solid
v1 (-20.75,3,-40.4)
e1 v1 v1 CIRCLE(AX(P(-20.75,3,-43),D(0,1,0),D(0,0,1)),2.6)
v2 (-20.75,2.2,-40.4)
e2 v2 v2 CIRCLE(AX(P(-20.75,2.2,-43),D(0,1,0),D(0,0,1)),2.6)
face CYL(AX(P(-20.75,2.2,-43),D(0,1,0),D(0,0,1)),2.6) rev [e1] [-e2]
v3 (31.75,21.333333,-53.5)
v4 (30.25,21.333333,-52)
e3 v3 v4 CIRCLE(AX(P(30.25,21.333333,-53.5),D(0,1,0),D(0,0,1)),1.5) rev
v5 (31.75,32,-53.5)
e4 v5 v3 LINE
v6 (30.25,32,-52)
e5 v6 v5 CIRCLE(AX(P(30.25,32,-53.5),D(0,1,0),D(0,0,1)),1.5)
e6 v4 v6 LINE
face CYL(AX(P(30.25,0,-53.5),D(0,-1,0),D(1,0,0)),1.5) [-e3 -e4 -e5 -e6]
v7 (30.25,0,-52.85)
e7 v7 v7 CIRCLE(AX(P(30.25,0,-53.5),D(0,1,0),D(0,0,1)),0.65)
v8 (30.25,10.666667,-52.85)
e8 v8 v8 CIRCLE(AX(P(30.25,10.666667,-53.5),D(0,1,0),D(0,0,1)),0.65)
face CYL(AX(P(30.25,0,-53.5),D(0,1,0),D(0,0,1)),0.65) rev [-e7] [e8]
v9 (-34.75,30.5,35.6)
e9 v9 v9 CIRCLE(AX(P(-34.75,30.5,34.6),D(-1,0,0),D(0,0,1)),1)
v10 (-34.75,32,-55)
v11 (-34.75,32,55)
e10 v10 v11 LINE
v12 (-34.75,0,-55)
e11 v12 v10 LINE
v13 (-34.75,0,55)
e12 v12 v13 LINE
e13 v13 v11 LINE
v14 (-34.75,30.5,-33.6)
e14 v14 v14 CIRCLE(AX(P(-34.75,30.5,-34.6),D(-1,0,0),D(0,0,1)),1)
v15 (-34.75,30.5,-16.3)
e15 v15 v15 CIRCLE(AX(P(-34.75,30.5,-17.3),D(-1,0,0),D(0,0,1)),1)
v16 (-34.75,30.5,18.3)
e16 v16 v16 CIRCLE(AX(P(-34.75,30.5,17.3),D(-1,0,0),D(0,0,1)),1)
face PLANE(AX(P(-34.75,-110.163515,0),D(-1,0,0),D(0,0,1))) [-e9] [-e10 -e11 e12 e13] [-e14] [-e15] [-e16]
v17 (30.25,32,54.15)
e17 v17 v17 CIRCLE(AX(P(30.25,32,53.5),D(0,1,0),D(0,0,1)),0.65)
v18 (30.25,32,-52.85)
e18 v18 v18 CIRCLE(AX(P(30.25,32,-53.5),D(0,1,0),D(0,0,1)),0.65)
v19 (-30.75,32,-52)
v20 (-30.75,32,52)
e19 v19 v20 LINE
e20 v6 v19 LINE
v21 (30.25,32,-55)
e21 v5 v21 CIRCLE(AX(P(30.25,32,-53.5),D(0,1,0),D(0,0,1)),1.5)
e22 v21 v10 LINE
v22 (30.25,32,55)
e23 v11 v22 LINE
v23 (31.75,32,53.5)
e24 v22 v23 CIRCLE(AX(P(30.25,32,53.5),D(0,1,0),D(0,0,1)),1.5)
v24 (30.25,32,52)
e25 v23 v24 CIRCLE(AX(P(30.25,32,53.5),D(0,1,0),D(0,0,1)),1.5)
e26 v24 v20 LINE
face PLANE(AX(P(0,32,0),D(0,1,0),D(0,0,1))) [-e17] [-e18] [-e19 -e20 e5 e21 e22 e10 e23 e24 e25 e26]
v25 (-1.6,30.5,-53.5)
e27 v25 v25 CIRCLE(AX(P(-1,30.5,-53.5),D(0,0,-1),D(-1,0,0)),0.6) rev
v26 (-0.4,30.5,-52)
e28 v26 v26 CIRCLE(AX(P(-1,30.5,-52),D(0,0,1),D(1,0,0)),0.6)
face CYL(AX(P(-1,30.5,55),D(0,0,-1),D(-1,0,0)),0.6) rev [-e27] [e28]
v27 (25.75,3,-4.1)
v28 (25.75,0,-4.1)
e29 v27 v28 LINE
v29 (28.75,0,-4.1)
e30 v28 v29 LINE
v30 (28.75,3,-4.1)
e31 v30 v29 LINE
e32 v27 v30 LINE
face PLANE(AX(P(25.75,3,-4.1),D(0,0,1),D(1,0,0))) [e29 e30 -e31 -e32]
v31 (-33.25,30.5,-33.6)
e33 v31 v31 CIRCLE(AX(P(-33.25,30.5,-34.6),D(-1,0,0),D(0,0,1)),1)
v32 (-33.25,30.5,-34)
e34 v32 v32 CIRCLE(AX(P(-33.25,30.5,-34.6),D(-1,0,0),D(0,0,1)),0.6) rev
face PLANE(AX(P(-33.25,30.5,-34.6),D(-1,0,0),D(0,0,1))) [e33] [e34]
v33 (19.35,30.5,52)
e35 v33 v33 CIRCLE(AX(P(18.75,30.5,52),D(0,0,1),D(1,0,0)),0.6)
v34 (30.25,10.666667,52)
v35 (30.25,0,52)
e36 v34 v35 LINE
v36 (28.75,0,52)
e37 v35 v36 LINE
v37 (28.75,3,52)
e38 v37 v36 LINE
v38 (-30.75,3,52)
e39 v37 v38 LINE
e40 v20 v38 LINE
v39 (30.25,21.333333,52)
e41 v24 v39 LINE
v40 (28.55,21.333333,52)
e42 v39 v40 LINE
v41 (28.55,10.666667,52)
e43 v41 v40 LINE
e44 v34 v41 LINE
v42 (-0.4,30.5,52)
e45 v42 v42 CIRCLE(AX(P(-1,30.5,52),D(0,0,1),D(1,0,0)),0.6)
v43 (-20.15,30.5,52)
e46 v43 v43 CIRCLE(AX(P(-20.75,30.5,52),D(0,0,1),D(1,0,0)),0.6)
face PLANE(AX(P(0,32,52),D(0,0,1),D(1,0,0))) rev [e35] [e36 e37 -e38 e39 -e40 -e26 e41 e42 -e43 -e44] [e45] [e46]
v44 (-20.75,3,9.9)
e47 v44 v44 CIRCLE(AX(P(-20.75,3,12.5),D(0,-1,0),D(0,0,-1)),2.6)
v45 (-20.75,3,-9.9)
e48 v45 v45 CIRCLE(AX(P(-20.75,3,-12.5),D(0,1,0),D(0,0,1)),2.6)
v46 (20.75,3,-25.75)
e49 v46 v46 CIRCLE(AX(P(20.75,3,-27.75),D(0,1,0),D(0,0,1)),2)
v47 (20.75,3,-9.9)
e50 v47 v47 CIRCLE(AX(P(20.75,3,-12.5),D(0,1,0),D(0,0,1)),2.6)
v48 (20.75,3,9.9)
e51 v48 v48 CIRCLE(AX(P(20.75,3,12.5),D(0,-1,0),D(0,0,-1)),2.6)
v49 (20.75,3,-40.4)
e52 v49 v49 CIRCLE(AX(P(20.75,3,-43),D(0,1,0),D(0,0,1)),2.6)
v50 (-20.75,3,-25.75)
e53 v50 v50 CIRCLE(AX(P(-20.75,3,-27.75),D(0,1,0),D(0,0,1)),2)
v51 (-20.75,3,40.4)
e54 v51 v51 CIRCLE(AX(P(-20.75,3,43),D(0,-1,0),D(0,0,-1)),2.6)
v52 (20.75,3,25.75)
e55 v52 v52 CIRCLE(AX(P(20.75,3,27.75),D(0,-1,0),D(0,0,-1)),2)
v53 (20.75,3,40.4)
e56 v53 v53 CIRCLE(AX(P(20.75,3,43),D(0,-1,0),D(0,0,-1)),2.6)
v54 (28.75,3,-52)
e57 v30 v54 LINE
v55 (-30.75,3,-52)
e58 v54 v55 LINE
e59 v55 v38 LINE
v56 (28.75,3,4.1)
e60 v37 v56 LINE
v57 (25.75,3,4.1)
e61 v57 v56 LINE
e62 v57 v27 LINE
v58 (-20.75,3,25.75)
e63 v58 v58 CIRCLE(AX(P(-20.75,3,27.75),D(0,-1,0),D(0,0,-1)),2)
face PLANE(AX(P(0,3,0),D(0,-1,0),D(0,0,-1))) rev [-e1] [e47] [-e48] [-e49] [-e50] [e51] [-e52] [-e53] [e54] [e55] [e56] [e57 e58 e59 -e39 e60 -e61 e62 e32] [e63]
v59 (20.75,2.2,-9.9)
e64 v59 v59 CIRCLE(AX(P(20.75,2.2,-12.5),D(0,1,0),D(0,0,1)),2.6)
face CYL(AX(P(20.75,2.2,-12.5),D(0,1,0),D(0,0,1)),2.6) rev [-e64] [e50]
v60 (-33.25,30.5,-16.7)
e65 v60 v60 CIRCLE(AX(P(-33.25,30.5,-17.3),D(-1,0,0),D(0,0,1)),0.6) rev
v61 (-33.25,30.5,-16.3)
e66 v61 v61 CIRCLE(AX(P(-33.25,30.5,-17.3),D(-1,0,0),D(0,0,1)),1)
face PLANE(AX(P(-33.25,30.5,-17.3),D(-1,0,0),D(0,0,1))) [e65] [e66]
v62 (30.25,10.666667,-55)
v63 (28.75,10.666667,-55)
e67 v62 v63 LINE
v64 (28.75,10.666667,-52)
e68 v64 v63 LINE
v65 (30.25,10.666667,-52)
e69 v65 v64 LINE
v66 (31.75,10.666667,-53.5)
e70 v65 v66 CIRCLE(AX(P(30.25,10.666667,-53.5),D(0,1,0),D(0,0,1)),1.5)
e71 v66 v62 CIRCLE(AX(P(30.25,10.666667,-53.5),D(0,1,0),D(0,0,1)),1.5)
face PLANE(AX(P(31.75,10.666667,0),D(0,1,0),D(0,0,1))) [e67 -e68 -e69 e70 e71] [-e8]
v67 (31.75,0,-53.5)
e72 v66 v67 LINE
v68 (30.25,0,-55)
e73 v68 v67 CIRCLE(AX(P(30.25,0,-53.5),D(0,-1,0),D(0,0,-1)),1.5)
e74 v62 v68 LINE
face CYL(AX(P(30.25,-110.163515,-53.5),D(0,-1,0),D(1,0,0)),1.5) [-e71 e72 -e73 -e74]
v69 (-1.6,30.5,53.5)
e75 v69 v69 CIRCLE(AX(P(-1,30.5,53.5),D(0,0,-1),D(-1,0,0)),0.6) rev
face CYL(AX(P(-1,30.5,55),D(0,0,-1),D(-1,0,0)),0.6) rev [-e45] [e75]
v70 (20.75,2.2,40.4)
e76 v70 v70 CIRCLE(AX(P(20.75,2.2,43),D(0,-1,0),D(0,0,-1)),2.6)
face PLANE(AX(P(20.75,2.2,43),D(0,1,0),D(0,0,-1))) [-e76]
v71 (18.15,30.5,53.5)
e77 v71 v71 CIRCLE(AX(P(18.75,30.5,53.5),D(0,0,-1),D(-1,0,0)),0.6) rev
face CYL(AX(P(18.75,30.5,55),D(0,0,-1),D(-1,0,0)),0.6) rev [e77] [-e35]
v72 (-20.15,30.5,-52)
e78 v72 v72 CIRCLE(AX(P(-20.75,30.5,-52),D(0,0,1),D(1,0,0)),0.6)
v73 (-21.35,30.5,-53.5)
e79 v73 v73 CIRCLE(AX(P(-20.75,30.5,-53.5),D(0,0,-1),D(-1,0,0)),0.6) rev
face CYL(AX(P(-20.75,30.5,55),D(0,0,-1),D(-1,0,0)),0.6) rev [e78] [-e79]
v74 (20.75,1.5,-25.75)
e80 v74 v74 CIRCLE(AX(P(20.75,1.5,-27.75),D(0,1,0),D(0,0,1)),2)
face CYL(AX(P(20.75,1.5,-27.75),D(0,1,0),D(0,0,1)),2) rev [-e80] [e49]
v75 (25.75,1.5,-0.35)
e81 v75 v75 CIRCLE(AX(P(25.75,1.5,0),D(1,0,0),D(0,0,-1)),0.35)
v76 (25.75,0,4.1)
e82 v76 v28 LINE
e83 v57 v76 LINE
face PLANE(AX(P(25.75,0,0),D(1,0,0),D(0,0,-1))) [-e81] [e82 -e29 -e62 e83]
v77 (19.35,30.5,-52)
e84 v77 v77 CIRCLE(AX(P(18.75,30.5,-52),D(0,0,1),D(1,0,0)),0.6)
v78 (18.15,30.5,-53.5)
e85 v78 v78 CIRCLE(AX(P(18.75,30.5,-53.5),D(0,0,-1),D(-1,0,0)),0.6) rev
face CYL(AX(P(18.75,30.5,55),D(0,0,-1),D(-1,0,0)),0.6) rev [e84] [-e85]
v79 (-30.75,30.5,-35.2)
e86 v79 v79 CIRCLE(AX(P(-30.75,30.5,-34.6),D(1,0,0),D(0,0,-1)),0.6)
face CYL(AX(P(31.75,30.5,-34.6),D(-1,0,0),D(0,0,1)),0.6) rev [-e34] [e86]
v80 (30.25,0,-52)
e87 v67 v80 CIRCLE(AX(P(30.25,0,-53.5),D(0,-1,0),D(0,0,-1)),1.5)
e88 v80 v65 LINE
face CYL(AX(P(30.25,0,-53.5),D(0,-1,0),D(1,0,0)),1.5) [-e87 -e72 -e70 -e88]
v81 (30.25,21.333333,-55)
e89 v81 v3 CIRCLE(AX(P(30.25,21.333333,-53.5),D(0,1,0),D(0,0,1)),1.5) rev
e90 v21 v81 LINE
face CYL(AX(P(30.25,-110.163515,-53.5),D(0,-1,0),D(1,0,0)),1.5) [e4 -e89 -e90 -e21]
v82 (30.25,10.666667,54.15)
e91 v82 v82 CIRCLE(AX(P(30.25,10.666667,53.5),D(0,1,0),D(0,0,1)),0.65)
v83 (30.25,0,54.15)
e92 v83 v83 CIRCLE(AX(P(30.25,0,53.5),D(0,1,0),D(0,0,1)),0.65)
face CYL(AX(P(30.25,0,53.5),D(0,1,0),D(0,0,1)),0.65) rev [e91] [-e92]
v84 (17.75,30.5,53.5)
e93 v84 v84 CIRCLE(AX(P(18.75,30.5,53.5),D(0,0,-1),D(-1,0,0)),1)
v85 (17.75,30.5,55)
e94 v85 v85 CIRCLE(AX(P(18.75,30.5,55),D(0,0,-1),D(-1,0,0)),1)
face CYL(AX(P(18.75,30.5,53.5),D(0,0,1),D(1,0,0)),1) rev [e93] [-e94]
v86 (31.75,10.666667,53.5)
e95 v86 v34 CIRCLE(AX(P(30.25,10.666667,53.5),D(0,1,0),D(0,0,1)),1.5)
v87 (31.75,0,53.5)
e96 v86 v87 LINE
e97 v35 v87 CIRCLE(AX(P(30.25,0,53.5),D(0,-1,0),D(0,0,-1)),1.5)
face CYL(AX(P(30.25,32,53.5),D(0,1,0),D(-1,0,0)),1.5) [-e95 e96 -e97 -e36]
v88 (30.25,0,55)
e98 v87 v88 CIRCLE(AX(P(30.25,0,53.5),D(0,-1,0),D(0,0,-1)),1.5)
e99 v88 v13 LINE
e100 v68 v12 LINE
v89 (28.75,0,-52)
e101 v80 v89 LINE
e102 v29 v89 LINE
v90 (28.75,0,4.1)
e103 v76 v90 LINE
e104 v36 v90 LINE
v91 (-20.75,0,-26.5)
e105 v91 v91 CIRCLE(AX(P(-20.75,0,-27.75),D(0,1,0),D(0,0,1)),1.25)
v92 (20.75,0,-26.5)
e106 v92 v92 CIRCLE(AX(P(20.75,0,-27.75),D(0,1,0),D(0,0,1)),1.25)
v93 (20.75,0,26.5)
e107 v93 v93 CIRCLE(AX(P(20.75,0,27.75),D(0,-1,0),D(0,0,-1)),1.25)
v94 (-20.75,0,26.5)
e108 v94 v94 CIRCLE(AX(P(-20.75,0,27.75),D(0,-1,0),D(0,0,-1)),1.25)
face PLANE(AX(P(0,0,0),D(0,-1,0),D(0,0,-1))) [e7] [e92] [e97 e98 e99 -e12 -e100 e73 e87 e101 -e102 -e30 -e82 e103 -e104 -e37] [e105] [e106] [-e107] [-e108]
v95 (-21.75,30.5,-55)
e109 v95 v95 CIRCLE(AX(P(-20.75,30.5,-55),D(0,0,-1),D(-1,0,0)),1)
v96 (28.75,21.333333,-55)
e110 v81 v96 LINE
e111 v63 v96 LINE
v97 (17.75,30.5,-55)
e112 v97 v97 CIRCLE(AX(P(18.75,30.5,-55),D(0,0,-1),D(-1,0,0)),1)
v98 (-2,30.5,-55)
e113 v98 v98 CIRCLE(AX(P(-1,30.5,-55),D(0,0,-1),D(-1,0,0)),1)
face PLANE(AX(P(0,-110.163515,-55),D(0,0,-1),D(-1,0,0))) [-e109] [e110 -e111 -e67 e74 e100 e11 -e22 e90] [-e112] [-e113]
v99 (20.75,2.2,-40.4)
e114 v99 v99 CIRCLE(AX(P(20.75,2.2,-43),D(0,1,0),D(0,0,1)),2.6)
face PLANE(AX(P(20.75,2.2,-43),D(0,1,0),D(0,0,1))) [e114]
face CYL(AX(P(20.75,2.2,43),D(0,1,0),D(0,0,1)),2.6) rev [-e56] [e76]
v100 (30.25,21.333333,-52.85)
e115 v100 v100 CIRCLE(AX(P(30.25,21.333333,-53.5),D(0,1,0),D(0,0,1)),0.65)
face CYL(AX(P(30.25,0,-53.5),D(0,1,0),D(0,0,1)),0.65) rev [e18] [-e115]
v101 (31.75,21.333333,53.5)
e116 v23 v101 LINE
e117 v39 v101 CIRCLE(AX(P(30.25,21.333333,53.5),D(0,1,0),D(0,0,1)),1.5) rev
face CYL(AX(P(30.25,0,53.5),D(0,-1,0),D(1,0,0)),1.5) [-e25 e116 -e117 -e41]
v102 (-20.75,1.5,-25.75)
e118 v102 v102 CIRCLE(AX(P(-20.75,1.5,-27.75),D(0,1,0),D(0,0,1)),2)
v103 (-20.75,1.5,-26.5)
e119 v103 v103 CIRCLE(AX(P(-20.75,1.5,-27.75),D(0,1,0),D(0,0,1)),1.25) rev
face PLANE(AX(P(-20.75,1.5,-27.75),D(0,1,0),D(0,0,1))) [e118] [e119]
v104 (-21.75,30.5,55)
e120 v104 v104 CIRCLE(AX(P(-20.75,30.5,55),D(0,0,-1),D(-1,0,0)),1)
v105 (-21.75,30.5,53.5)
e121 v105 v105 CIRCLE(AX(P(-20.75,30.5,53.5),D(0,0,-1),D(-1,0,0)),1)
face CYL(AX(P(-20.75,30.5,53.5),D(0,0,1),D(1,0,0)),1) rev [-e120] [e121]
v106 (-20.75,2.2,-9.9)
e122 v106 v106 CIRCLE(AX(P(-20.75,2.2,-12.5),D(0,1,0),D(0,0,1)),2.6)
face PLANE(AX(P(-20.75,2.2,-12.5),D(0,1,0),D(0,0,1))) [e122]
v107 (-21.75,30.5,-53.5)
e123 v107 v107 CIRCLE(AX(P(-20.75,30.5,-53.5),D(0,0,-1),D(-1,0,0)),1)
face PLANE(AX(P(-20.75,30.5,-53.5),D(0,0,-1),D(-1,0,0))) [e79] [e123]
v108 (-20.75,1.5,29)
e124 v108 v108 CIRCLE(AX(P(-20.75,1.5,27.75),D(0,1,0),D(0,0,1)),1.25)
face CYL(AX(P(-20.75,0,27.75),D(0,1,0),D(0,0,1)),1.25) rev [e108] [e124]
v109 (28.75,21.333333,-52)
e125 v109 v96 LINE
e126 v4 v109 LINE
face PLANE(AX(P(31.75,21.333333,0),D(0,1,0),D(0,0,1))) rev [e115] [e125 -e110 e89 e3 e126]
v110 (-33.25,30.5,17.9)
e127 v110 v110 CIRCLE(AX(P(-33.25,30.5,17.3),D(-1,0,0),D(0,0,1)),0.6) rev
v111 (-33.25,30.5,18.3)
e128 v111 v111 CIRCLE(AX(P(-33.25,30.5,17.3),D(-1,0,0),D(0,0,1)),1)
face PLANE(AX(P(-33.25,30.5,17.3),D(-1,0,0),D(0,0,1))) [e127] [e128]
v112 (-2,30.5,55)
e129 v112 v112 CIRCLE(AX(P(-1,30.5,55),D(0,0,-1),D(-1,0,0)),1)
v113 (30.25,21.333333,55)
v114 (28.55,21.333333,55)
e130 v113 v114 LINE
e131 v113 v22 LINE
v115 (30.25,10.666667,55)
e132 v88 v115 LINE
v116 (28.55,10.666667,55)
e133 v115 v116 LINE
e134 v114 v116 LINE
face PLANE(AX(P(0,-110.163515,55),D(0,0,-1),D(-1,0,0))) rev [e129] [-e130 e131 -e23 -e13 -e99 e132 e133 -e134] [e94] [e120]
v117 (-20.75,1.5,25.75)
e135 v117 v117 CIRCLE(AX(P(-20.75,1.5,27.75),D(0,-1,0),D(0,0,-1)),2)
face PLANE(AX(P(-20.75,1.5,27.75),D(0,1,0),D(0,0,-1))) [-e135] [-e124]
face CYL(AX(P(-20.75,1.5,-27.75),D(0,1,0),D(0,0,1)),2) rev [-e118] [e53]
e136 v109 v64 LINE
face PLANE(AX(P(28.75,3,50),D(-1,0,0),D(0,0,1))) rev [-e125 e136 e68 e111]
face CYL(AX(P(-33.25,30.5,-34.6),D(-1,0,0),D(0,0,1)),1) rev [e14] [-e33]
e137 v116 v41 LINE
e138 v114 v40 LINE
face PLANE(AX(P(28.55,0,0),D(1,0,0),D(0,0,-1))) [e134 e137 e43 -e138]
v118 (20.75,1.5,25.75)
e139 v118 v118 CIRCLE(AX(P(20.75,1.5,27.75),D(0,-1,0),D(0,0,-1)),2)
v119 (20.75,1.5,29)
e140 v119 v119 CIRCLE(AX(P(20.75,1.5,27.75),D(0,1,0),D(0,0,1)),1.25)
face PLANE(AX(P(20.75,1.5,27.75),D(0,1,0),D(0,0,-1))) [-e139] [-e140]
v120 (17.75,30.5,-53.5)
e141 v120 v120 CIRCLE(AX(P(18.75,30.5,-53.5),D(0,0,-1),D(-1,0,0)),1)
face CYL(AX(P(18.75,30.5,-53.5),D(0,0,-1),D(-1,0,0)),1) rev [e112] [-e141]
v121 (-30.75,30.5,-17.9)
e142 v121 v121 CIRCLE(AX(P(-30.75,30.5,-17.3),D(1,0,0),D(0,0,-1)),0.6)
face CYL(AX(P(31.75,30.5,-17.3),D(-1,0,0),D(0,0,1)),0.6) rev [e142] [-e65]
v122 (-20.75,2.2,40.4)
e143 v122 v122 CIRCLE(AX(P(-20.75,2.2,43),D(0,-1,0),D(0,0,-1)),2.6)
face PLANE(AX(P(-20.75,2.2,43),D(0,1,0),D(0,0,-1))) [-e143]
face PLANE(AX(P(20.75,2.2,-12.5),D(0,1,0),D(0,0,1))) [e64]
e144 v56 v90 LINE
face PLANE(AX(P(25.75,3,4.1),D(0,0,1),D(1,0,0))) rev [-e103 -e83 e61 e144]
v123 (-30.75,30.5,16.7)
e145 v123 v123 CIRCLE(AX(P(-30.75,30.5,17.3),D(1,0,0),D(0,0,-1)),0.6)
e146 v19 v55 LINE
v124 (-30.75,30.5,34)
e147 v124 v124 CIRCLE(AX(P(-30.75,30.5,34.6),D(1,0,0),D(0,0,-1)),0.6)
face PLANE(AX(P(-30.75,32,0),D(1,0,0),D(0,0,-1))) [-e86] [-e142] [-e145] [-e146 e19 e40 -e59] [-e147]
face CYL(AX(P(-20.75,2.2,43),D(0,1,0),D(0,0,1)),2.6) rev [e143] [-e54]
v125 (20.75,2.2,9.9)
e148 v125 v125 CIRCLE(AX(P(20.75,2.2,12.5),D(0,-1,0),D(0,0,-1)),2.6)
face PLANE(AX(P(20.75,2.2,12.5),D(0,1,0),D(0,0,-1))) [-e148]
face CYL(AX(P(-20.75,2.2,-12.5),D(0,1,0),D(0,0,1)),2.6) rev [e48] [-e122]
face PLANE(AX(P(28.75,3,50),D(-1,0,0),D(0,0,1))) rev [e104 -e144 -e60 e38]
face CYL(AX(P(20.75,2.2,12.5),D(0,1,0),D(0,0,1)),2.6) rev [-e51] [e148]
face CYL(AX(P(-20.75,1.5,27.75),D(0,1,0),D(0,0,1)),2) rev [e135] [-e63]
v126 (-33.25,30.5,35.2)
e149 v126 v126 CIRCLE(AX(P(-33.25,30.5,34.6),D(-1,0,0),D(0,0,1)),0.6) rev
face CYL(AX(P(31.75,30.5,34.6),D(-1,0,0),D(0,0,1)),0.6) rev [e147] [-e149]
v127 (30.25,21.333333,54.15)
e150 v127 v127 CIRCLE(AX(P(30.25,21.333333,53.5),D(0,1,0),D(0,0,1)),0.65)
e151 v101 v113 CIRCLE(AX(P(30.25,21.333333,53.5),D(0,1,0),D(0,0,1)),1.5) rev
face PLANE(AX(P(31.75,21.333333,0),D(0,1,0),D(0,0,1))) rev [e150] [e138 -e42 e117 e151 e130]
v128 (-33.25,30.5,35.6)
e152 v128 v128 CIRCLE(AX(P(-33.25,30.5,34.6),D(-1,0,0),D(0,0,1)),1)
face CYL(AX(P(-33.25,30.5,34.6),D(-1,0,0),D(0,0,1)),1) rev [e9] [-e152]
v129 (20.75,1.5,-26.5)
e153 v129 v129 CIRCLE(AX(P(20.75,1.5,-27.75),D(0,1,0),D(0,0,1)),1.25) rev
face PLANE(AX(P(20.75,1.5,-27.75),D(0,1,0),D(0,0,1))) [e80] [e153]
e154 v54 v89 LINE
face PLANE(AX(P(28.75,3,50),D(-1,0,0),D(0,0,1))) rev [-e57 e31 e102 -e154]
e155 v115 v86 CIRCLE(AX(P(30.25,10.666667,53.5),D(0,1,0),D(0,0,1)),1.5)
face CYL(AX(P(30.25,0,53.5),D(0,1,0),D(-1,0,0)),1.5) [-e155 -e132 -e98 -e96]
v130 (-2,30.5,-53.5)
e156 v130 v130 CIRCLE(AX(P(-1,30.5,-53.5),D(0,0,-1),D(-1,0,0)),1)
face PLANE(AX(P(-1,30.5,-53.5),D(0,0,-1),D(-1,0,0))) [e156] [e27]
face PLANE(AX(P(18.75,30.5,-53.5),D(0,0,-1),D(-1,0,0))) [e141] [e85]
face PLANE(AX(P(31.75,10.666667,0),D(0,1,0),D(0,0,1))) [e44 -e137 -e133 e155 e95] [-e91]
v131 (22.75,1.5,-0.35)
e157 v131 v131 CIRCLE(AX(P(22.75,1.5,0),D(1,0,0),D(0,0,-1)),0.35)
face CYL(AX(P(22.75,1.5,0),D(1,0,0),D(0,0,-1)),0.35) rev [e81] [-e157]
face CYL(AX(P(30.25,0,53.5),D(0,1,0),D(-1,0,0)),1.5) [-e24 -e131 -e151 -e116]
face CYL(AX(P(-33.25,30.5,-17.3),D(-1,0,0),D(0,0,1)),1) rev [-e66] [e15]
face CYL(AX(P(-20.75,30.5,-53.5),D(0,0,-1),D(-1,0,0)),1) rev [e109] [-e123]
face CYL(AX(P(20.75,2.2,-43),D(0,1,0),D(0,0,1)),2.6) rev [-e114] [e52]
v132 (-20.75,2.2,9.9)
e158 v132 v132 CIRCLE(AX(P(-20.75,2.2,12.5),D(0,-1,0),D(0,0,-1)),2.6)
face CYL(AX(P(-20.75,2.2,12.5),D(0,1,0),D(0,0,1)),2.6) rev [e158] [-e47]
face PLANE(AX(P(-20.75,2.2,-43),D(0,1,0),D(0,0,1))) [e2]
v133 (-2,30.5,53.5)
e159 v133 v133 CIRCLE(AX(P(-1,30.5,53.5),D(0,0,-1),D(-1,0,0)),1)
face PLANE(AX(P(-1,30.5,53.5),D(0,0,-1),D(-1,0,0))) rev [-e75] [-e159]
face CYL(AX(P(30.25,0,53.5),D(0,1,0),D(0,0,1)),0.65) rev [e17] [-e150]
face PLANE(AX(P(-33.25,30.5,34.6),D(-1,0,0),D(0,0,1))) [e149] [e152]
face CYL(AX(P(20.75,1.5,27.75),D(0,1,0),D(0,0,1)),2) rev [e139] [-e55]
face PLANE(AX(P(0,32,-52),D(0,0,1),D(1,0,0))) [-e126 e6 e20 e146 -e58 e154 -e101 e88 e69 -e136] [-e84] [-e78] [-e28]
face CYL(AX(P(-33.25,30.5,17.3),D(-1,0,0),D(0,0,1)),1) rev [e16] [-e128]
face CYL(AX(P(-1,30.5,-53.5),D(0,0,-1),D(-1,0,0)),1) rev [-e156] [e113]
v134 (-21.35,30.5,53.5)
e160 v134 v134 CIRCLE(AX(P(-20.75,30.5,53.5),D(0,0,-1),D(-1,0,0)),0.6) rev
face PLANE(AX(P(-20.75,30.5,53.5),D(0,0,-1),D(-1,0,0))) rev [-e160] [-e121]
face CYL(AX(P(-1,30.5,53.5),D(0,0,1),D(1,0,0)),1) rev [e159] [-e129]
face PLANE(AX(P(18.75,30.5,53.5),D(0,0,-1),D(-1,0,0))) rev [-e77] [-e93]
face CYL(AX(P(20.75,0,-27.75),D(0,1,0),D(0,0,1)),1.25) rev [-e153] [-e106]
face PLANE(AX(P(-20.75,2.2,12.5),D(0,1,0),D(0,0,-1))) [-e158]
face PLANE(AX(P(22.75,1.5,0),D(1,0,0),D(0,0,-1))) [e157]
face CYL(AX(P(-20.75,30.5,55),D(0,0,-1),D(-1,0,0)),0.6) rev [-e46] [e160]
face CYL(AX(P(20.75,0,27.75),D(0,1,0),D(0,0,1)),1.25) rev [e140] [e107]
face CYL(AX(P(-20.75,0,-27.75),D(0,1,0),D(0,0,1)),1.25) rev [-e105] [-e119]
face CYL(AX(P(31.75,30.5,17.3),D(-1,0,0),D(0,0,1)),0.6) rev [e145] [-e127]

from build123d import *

# Parameters (mm, degrees)
SKETCH_1_W           = 57.5
SKETCH_1_H           = 100
EXTRUDE_1_DEPTH      = 3
SKETCH_2_R           = 2.6
CUT_EXTRUDE_1_DEPTH  = 0.8
SKETCH_3_R           = 1.25
CUT_EXTRUDE_2_DEPTH  = 58.754328842
SKETCH_3_3_R         = 2
CUT_EXTRUDE_3_DEPTH  = 1.5
EXTRUDE_2_DEPTH      = 3
SKETCH_5_3_W         = 57.5
SKETCH_5_3_H         = 3
SKETCH_5_3_W_2       = 2
EXTRUDE_3_DEPTH      = 29
SKETCH_6_W           = 8.2
SKETCH_6_H           = 3
CUT_EXTRUDE_4_DEPTH  = 3
CUT_EXTRUDE_START    = -3
SKETCH_6_4_R         = 0.35
CUT_EXTRUDE_6_DEPTH  = 3
SKETCH_7_W           = 3
SKETCH_7_H           = 10.666666667
EXTRUDE_4_DEPTH      = 3
FILLET_1_R           = 1.5
SKETCH_8_R           = 0.65
CUT_EXTRUDE_7_DEPTH  = 73.50215514
SKETCH_7_3_W         = 3
SKETCH_7_3_H         = 10.666666666
CUT_EXTRUDE_8_DEPTH  = 0.2
SKETCH_10_R          = 0.6
CUT_EXTRUDE_9_DEPTH  = 120.714504134
SKETCH_11_R          = 0.6
CUT_EXTRUDE_10_DEPTH = 93.03939374
SKETCH_12_R          = 1
CUT_EXTRUDE_11_DEPTH = 1.5
CUT_EXTRUDE_START_2  = -108.5
SKETCH_12_2_R        = 1
CUT_EXTRUDE_12_DEPTH = 1.5
SKETCH_13_R          = 1
CUT_EXTRUDE_13_DEPTH = 1.5


with BuildPart() as part:
    # 草图1 → 凸台-拉伸1 (new body)
    with BuildSketch(Plane(origin=(0, 0, 0), x_dir=(1, 0, 0), z_dir=(0, 1, 0))):
        Rectangle(SKETCH_1_W, SKETCH_1_H)
    extrude(amount=EXTRUDE_1_DEPTH)

    # 草图2 → 切除-拉伸1 (cut)
    with BuildSketch(Plane(origin=(0, 3, 0), x_dir=(1, 0, 0), z_dir=(0, 1, 0))):
        with Locations(Location((20.75, 43, 0), (0, 0, 270))):
            Circle(SKETCH_2_R)
        with Locations(Location((20.75, 12.5, 0), (0, 0, 270))):
            Circle(SKETCH_2_R)
        with Locations(Location((-20.75, 12.5, 0), (0, 0, 270))):
            Circle(SKETCH_2_R)
        with Locations(Location((-20.75, 43, 0), (0, 0, 270))):
            Circle(SKETCH_2_R)
    cut_extrude_1 = extrude(amount=-CUT_EXTRUDE_1_DEPTH, mode=Mode.SUBTRACT)

    # 草图3 → 切除-拉伸2 (cut, through all)
    with BuildSketch(Plane(origin=(0, 3, 0), x_dir=(1, 0, 0), z_dir=(0, 1, 0))):
        with Locations(Location((20.75, 27.75, 0), (0, 0, 270))):
            Circle(SKETCH_3_R)
        with Locations(Location((-20.75, 27.75, 0), (0, 0, 270))):
            Circle(SKETCH_3_R)
    cut_extrude_2 = extrude(amount=-CUT_EXTRUDE_2_DEPTH, mode=Mode.SUBTRACT)

    # 草图3<3> → 切除-拉伸3 (cut)
    with BuildSketch(Plane(origin=(0, 3, 0), x_dir=(1, 0, 0), z_dir=(0, 1, 0))):
        with Locations(Location((20.75, 27.75, 0), (0, 0, 270))):
            Circle(SKETCH_3_3_R)
        with Locations(Location((-20.75, 27.75, 0), (0, 0, 270))):
            Circle(SKETCH_3_3_R)
    cut_extrude_3 = extrude(amount=-CUT_EXTRUDE_3_DEPTH, mode=Mode.SUBTRACT)

    # 镜向1: 切除-拉伸1, 切除-拉伸2, 切除-拉伸3 across plane
    add(cut_extrude_1.mirror(Plane.XY), mode=Mode.SUBTRACT)
    add(cut_extrude_2.mirror(Plane.XY), mode=Mode.SUBTRACT)
    add(cut_extrude_3.mirror(Plane.XY), mode=Mode.SUBTRACT)

    # 草图5 → 凸台-拉伸2 (add)
    with BuildSketch(Plane(origin=(0, 3, 0), x_dir=(1, 0, 0), z_dir=(0, 1, 0))):
        Polygon((28.75, -50), (-28.75, -50), (-28.75, 50), (28.75, 50), (28.75, 55), (-34.75, 55), (-34.75, -55), (28.75, -55), align=None)
    extrude(amount=-EXTRUDE_2_DEPTH)

    # 草图5<3> → 凸台-拉伸3 (add)
    with BuildSketch(Plane(origin=(0, 3, 0), x_dir=(1, 0, 0), z_dir=(0, 1, 0))):
        with Locations((0, -53.5)):
            Rectangle(SKETCH_5_3_W, SKETCH_5_3_H)
        with Locations((0, 53.5)):
            Rectangle(SKETCH_5_3_W, SKETCH_5_3_H)
        Polygon((-30.75, -55), (-30.75, -52), (-30.75, 52), (-30.75, 55), (-34.75, 55), (-34.75, -55), align=None)
        with Locations((-29.75, 53.5)):
            Rectangle(SKETCH_5_3_W_2, SKETCH_5_3_H)
        with Locations((-29.75, -53.5)):
            Rectangle(SKETCH_5_3_W_2, SKETCH_5_3_H)
    extrude(amount=EXTRUDE_3_DEPTH)

    # 草图6 → 切除-拉伸4 (cut)
    with BuildSketch(Plane(origin=(28.75, 0, 0), x_dir=(0, 0, -1), z_dir=(1, 0, 0))):
        with Locations((0, 1.5)):
            Rectangle(SKETCH_6_W, SKETCH_6_H)
    extrude(amount=-CUT_EXTRUDE_4_DEPTH, mode=Mode.SUBTRACT)

    # 草图6<4> → 切除-拉伸6 (cut)
    with BuildSketch(Plane(origin=(28.75, 0, 0), x_dir=(0, 0, -1), z_dir=(1, 0, 0)).offset(CUT_EXTRUDE_START)):
        with Locations((0, 1.5)):
            Circle(SKETCH_6_4_R)
    extrude(amount=-CUT_EXTRUDE_6_DEPTH, mode=Mode.SUBTRACT)

    # 草图7 → 凸台-拉伸4 (add)
    with BuildSketch(Plane(origin=(28.75, 0, 0), x_dir=(0, 0, -1), z_dir=(1, 0, 0))):
        with Locations((-53.5, 26.666666666)):
            Rectangle(SKETCH_7_W, SKETCH_7_H)
        Polygon((-52, 10.666666667), (-55, 10.666666667), (-55, 0), (-52, 0), (-52, 3), align=None)
        with Locations((53.5, 26.666666666)):
            Rectangle(SKETCH_7_W, SKETCH_7_H)
        with Locations((53.5, 5.333333334)):
            Rectangle(SKETCH_7_W, SKETCH_7_H)
    extrude(amount=EXTRUDE_4_DEPTH)

    # 圆角1
    # the kernel refuses this fillet: 1.5 mm, written as the material it takes off along each edge
    with BuildSketch(Plane(origin=(31.75, 17.583333333, -55), x_dir=(-1, 0, 0), z_dir=(0, 1, 0)), Plane(origin=(31.75, 35.75, -52), x_dir=(-1, 0, 0), z_dir=(0, -1, 0)), Plane(origin=(31.75, -3.75, -55), x_dir=(-1, 0, 0), z_dir=(0, 1, 0)), Plane(origin=(31.75, 14.416666667, -52), x_dir=(-1, 0, 0), z_dir=(0, -1, 0)), Plane(origin=(31.75, 14.416666667, 55), x_dir=(-1, 0, 0), z_dir=(0, -1, 0)), Plane(origin=(31.75, 17.583333333, 52), x_dir=(-1, 0, 0), z_dir=(0, 1, 0)), Plane(origin=(31.75, 35.75, 55), x_dir=(-1, 0, 0), z_dir=(0, -1, 0))) as fillet_1_piece_1:
        with BuildLine():
            CenterArc((FILLET_1_R, FILLET_1_R), FILLET_1_R, 180, 90)
            Line((0, FILLET_1_R), (0, 0))
            Line((0, 0), (FILLET_1_R, 0))
        make_face()
    extrude(amount=18.166666667, mode=Mode.SUBTRACT)
    with BuildSketch(Plane(origin=(31.75, 14.416666667, 52), x_dir=(-1, 0, 0), z_dir=(0, -1, 0))) as fillet_1_piece_2:
        with BuildLine():
            CenterArc((FILLET_1_R, -FILLET_1_R), FILLET_1_R, 90, 90)
            Line((0, -FILLET_1_R), (0, 0))
            Line((0, 0), (FILLET_1_R, 0))
        make_face()
    extrude(amount=18.166666667, mode=Mode.SUBTRACT)

    # 草图8 → 切除-拉伸7 (cut, through all)
    with BuildSketch(Plane(origin=(0, 32, 0), x_dir=(1, 0, 0), z_dir=(0, 1, 0))):
        with Locations(Location((30.25, -53.5, 0), (0, 0, 270))):
            Circle(SKETCH_8_R)
        with Locations(Location((30.25, 53.5, 0), (0, 0, 270))):
            Circle(SKETCH_8_R)
    extrude(amount=-CUT_EXTRUDE_7_DEPTH, mode=Mode.SUBTRACT)

    # 草图7<3> → 切除-拉伸8 (cut)
    with BuildSketch(Plane(origin=(28.75, 0, 0), x_dir=(0, 0, -1), z_dir=(1, 0, 0))):
        with Locations((-53.5, 16)):
            Rectangle(SKETCH_7_3_W, SKETCH_7_3_H)
    extrude(amount=-CUT_EXTRUDE_8_DEPTH, mode=Mode.SUBTRACT)

    # 草图10 → 切除-拉伸9 (cut, through all)
    with BuildSketch(Plane(origin=(0, 0, -55), x_dir=(-1, 0, 0), z_dir=(0, 0, -1))):
        with Locations((-18.75, 30.5)):
            Circle(SKETCH_10_R)
        with Locations((1, 30.5)):
            Circle(SKETCH_10_R)
        with Locations((20.75, 30.5)):
            Circle(SKETCH_10_R)
    extrude(amount=-CUT_EXTRUDE_9_DEPTH, mode=Mode.SUBTRACT)

    # 草图11 → 切除-拉伸10 (cut, through all)
    with BuildSketch(Plane.ZY.offset(34.75)):
        with Locations((-34.6, 30.5)):
            Circle(SKETCH_11_R)
        with Locations((-17.3, 30.5)):
            Circle(SKETCH_11_R)
        with Locations((17.3, 30.5)):
            Circle(SKETCH_11_R)
        with Locations((34.6, 30.5)):
            Circle(SKETCH_11_R)
    extrude(amount=-CUT_EXTRUDE_10_DEPTH, mode=Mode.SUBTRACT)

    # 草图12 → 切除-拉伸11 (cut)
    with BuildSketch(Plane(origin=(0, 0, -55), x_dir=(-1, 0, 0), z_dir=(0, 0, -1))):
        with Locations((-18.75, 30.5)):
            Circle(SKETCH_12_R)
        with Locations((1, 30.5)):
            Circle(SKETCH_12_R)
        with Locations((20.75, 30.5)):
            Circle(SKETCH_12_R)
    extrude(amount=-CUT_EXTRUDE_11_DEPTH, mode=Mode.SUBTRACT)

    # 草图12<2> → 切除-拉伸12 (cut)
    with BuildSketch(Plane(origin=(0, 0, -55), x_dir=(-1, 0, 0), z_dir=(0, 0, -1)).offset(CUT_EXTRUDE_START_2)):
        with Locations((-18.75, 30.5)):
            Circle(SKETCH_12_2_R)
        with Locations((1, 30.5)):
            Circle(SKETCH_12_2_R)
        with Locations((20.75, 30.5)):
            Circle(SKETCH_12_2_R)
    extrude(amount=-CUT_EXTRUDE_12_DEPTH, mode=Mode.SUBTRACT)

    # 草图13 → 切除-拉伸13 (cut)
    with BuildSketch(Plane.ZY.offset(34.75)):
        with Locations((-34.6, 30.5)):
            Circle(SKETCH_13_R)
        with Locations((-17.3, 30.5)):
            Circle(SKETCH_13_R)
        with Locations((17.3, 30.5)):
            Circle(SKETCH_13_R)
        with Locations((34.6, 30.5)):
            Circle(SKETCH_13_R)
    extrude(amount=-CUT_EXTRUDE_13_DEPTH, mode=Mode.SUBTRACT)


solid = part.part
